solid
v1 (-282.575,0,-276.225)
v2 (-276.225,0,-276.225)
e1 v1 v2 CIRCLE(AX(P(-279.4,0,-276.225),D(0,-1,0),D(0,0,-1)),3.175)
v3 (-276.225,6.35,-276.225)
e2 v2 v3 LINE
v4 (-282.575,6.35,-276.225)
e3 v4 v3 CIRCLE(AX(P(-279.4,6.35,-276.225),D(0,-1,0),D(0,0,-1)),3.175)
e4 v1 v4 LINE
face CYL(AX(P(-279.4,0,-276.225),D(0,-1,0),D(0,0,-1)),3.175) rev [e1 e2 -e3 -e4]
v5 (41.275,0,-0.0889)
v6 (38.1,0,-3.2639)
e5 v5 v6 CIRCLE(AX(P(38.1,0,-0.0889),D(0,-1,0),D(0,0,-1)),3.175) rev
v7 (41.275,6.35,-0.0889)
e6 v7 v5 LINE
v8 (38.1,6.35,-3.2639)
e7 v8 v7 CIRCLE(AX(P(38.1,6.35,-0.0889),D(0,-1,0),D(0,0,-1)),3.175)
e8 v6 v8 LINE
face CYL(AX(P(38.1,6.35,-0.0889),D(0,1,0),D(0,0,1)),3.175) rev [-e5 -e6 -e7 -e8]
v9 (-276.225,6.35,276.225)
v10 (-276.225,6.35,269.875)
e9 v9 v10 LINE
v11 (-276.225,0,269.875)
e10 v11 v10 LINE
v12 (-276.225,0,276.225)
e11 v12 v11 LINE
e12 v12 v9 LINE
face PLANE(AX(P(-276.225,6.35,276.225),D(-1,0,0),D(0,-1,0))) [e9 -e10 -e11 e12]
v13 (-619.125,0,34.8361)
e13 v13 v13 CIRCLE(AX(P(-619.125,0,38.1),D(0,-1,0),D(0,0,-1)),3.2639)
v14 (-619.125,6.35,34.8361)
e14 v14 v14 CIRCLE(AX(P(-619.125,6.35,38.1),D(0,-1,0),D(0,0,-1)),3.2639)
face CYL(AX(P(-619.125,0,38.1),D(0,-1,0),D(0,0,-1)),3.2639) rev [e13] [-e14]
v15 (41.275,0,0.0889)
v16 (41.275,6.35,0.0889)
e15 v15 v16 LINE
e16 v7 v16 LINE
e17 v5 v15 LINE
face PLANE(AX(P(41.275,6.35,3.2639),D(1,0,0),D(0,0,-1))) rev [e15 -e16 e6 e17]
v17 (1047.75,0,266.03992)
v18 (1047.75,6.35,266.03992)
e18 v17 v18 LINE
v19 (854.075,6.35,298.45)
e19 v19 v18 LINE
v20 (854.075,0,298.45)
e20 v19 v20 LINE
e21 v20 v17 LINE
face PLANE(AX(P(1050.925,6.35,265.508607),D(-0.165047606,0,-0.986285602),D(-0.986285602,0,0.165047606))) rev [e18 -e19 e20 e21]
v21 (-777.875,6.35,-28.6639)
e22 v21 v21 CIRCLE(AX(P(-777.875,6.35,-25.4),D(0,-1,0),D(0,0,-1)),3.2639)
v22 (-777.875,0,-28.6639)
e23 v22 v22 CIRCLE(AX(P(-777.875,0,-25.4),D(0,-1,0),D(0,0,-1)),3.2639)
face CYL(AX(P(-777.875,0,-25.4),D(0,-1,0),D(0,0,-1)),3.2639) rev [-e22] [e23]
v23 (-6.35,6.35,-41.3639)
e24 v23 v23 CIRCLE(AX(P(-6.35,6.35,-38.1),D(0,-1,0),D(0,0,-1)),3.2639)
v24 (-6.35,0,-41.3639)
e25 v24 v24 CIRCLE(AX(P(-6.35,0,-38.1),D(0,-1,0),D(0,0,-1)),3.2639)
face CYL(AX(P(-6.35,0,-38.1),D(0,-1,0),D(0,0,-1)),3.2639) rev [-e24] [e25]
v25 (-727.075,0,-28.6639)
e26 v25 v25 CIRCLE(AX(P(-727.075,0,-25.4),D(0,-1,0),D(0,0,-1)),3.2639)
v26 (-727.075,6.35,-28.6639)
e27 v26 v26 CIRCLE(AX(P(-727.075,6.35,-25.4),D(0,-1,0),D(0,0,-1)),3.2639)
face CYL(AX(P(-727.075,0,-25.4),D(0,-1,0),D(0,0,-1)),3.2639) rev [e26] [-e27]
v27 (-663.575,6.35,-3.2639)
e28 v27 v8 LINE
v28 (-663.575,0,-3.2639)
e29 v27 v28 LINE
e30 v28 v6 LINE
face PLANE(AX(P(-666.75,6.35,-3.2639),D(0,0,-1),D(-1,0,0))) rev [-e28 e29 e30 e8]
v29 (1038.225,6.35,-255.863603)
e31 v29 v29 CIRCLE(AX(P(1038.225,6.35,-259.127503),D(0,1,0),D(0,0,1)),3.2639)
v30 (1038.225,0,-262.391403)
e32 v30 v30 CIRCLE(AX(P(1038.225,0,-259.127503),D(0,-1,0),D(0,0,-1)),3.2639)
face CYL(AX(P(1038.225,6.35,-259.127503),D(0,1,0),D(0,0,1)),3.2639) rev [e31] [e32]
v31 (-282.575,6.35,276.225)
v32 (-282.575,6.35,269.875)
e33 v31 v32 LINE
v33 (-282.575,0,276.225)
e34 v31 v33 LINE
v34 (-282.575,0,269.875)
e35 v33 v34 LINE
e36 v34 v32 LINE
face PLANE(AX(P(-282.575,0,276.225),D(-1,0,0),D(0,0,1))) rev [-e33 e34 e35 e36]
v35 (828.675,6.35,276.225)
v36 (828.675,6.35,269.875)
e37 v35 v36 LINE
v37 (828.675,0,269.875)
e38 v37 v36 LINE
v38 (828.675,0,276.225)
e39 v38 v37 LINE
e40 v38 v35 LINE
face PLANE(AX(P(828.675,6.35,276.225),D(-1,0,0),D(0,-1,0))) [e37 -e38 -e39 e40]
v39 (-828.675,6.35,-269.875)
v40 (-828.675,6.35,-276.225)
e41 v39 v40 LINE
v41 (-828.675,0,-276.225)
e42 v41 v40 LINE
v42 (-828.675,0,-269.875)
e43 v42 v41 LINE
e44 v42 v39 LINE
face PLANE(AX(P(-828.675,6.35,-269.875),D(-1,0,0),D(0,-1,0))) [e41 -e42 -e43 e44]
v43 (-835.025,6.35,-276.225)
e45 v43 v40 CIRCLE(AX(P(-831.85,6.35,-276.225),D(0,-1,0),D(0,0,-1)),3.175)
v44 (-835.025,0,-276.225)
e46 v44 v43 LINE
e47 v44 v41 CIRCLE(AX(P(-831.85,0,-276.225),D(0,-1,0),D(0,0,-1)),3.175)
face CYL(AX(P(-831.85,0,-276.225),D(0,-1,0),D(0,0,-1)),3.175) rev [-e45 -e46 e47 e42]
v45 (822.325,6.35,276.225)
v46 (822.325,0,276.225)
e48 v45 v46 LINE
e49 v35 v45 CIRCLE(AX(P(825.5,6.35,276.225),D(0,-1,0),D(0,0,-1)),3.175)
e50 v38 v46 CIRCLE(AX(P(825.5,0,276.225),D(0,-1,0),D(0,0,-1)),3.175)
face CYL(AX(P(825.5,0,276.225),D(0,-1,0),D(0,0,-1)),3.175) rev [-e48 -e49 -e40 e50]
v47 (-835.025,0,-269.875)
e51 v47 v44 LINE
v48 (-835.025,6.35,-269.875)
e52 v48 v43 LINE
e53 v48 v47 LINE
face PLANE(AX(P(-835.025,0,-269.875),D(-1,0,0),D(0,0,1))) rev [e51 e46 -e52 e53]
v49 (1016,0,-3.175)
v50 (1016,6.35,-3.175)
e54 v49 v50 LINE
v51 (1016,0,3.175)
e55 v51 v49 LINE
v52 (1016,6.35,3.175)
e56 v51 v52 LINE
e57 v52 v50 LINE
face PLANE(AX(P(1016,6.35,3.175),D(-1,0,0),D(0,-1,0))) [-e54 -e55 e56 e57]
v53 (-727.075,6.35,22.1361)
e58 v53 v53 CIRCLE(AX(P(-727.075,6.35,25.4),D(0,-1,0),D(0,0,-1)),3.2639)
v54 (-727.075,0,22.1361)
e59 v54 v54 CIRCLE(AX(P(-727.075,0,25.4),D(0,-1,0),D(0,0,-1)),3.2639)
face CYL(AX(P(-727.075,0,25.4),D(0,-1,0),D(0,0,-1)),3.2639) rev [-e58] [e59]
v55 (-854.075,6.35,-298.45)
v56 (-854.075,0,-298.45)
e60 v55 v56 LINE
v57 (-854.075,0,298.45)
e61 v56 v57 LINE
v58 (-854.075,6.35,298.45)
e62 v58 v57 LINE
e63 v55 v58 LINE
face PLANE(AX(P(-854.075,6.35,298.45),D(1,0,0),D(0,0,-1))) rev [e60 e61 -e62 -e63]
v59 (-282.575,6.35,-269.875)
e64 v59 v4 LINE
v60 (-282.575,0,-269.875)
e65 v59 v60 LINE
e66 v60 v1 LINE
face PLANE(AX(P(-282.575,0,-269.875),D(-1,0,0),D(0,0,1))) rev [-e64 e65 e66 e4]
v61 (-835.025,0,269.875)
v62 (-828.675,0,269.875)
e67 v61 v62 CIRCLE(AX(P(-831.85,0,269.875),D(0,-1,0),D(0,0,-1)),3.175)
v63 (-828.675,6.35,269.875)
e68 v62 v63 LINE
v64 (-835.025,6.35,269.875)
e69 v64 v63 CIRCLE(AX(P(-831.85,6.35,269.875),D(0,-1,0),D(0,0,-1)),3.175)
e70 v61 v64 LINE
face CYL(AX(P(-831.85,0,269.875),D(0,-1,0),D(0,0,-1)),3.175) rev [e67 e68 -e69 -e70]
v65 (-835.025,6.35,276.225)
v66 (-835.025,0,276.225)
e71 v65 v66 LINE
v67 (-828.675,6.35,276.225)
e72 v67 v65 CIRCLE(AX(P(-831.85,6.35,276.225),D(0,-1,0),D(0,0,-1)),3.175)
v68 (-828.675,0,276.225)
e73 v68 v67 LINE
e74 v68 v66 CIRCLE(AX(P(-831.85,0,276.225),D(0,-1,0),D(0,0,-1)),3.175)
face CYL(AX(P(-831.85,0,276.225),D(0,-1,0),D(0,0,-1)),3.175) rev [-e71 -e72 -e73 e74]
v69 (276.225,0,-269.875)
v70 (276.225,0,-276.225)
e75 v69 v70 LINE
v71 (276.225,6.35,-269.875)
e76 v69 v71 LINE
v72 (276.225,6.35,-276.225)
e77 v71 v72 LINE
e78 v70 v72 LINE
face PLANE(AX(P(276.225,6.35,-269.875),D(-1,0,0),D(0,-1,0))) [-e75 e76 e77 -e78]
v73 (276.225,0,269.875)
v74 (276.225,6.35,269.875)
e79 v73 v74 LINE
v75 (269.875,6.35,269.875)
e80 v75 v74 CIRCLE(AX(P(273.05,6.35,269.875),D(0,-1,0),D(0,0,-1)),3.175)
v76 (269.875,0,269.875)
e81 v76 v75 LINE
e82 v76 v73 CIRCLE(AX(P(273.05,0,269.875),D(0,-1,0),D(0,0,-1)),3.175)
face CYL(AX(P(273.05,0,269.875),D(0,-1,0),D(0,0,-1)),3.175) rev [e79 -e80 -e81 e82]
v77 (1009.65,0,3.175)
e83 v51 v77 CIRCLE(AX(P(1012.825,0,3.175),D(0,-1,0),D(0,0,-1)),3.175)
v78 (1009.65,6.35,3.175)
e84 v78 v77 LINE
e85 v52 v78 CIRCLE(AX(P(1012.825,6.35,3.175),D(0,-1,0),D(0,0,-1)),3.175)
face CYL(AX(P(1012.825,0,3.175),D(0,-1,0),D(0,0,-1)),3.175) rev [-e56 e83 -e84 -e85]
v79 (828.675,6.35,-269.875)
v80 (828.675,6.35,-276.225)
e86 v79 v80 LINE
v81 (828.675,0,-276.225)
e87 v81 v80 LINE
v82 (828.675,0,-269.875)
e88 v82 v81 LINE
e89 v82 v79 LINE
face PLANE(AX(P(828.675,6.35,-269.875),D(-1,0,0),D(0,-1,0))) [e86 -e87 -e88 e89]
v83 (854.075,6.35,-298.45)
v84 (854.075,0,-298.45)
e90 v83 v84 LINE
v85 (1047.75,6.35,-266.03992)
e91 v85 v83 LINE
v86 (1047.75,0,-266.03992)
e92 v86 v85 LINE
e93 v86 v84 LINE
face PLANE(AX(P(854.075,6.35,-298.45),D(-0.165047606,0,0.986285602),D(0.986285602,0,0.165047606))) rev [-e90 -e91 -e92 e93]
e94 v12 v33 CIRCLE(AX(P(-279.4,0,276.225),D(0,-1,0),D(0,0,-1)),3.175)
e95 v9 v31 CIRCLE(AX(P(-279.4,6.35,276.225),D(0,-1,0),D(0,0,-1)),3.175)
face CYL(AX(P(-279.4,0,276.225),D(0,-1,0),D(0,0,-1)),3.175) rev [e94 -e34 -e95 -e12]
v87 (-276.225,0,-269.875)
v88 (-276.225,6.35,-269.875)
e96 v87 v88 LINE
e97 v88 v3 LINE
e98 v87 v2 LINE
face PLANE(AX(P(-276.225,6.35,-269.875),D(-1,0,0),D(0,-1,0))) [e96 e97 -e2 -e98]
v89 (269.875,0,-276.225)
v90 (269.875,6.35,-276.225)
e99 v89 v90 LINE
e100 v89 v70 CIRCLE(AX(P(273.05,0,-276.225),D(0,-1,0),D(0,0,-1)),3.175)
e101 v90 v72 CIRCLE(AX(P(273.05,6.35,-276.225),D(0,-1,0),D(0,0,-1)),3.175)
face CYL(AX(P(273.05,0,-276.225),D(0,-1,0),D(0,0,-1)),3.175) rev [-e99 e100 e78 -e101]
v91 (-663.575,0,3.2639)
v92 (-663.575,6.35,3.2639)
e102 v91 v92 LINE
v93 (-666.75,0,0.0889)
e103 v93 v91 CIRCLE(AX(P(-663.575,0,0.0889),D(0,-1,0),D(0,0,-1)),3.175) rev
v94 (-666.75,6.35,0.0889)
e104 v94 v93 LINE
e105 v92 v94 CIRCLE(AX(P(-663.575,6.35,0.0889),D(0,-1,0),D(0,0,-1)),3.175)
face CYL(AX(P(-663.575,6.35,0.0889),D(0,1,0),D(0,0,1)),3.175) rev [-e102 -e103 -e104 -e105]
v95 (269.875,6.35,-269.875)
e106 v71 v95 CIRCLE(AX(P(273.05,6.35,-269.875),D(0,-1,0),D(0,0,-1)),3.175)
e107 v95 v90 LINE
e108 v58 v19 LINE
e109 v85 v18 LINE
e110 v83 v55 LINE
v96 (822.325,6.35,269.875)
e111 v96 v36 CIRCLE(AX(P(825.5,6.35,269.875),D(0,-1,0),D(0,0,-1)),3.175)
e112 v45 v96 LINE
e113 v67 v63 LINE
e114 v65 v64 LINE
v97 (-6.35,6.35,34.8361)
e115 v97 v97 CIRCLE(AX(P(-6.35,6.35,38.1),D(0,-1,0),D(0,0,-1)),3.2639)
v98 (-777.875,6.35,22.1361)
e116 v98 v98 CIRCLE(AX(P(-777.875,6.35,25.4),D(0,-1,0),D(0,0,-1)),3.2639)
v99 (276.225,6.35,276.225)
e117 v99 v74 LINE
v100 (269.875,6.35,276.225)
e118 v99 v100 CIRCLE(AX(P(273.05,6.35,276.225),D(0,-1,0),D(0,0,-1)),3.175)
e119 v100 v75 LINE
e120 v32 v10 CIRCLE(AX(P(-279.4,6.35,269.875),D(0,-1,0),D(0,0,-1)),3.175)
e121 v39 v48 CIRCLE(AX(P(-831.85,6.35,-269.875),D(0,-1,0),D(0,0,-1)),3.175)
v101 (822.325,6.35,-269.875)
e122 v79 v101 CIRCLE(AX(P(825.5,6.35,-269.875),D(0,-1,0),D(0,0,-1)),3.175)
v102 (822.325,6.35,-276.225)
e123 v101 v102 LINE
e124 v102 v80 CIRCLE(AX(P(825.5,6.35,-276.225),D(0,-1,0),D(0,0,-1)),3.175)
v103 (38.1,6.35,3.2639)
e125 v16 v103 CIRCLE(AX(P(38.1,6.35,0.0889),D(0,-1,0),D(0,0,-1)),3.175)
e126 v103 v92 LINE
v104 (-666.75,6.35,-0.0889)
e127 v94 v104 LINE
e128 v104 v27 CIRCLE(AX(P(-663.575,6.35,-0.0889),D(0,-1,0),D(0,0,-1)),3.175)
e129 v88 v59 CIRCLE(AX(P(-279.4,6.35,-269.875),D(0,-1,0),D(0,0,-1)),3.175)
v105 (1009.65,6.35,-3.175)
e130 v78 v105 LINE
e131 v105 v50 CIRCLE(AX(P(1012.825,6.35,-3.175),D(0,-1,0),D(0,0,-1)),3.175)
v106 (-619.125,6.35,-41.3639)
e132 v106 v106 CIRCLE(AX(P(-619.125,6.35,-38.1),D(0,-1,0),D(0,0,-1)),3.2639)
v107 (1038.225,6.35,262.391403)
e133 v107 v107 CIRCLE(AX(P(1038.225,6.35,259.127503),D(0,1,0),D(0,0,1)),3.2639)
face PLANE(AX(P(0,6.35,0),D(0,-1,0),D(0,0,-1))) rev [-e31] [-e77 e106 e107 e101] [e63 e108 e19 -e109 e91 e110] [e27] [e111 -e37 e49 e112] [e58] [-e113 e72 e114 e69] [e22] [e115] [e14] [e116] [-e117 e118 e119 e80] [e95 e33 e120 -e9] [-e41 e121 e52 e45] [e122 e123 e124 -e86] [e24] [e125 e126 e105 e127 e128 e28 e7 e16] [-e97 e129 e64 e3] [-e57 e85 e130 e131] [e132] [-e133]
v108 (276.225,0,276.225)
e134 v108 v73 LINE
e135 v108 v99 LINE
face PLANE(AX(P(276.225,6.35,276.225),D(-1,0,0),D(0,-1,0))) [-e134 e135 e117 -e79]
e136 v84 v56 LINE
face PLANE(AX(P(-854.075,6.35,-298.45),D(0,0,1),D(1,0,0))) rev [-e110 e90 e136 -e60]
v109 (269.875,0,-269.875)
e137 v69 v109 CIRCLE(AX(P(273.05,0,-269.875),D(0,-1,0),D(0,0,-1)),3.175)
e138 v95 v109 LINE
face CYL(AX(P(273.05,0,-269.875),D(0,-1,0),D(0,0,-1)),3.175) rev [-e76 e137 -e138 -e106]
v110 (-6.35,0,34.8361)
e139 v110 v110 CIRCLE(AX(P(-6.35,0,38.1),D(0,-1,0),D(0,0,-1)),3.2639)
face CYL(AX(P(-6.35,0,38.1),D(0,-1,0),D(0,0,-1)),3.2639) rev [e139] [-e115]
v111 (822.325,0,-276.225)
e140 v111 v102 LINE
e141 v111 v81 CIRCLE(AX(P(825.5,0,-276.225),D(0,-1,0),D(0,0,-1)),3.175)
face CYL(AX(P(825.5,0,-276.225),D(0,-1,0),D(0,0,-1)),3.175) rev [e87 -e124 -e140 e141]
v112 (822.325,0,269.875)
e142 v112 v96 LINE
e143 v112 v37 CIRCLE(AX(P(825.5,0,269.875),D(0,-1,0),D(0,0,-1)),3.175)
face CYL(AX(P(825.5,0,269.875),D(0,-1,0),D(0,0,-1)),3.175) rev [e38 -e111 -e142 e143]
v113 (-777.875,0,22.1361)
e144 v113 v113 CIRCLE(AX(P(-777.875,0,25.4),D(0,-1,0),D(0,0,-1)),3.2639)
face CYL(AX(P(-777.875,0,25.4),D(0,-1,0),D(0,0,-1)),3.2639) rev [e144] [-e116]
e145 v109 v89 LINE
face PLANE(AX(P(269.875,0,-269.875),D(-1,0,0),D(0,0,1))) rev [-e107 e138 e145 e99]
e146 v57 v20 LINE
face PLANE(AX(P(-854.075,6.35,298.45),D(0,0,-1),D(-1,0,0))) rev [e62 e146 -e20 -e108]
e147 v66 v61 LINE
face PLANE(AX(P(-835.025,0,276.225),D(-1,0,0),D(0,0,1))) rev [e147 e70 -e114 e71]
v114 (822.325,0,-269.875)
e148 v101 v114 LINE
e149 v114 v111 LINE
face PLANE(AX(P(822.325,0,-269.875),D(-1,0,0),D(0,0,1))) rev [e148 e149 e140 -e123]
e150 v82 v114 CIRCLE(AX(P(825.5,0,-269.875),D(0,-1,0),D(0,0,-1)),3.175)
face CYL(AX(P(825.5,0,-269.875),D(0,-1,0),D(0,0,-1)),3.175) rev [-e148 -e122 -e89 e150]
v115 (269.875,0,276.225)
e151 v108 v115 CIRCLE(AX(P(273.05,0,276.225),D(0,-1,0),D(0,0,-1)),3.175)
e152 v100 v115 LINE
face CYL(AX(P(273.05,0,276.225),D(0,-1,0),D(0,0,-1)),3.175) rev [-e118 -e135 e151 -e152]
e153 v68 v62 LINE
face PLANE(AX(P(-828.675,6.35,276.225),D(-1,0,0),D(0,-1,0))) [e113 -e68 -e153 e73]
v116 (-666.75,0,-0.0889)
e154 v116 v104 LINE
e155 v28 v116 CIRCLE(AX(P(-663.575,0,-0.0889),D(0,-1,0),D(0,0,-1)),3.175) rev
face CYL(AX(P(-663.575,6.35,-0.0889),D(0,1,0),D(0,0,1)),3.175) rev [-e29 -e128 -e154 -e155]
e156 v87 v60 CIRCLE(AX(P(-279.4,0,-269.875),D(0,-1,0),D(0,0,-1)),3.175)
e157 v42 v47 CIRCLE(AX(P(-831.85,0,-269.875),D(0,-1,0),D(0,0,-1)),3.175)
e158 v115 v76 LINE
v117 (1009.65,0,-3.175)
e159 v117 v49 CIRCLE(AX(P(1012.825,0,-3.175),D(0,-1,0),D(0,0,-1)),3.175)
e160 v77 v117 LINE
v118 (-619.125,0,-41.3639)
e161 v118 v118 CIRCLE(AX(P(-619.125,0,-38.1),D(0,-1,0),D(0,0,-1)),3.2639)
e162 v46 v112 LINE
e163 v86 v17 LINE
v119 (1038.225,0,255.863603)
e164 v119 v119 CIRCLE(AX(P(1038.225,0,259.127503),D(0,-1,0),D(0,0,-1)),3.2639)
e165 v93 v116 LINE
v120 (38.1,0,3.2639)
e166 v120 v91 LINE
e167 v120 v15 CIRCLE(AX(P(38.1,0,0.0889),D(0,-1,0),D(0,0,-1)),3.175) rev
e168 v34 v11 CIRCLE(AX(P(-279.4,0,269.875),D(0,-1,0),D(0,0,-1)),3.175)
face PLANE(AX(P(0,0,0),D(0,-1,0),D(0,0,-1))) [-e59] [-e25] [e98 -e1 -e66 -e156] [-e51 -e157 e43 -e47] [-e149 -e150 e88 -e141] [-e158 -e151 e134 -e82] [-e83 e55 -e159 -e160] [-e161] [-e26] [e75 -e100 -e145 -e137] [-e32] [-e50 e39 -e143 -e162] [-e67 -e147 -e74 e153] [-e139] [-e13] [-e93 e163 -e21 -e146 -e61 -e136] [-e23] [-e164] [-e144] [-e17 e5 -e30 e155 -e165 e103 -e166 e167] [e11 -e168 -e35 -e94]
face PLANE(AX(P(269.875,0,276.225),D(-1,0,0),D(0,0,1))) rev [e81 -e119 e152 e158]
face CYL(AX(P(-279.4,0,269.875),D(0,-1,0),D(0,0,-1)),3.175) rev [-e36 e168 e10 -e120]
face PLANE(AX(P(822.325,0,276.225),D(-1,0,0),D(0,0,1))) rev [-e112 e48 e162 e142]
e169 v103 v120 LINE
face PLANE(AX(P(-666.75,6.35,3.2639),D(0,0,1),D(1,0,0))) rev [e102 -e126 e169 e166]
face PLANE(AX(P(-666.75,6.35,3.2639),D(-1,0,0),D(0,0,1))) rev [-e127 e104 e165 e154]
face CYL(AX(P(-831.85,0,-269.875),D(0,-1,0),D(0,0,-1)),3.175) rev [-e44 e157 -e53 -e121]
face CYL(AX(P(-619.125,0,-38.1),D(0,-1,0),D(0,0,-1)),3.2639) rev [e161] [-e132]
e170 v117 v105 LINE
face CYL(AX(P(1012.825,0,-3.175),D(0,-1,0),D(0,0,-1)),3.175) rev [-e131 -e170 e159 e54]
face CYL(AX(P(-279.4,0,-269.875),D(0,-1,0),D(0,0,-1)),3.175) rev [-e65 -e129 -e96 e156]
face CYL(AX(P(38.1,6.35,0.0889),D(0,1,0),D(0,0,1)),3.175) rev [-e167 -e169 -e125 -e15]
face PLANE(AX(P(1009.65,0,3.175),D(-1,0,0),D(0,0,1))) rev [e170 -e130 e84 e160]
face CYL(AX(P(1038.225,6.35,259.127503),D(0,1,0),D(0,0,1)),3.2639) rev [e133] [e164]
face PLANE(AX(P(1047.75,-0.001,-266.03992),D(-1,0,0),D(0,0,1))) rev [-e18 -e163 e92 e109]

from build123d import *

# Parameters (mm, degrees)
BOSS_EXTRUDE1_DEPTH             = 6.35
F_1_4_0_25_DIAMETER_SLOT2_DEPTH = 6.35
CUT_EXTRUDE2_REACH              = 1094.5
F_0_257_DIAMETER_HOLE3_D        = 6.5278
F_0_257_DIAMETER_HOLE2_D        = 6.5278
SKETCH32_W                      = 708.025
SKETCH32_H                      = 6.5278
CUT_EXTRUDE5_DEPTH              = 1090.446092058
FILLET3_R                       = 3.175
F_0_257_DIAMETER_HOLE1_D        = 6.5278


# Read off the part's stored shape, not the designer's step: 1/4 (0.25) Diameter Slot2
with BuildPart() as part:
    # Sketch1 → Boss-Extrude1 (new body)
    with BuildSketch(Plane(origin=(0, 0, 0), x_dir=(1, 0, 0), z_dir=(0, 1, 0))):
        Polygon((854.075, 298.45), (1050.925, 265.508607402), (1050.925, -265.508607402), (854.075, -298.45), (-854.075, -298.45), (-854.075, 298.45), align=None)
    extrude(amount=BOSS_EXTRUDE1_DEPTH)

    # 1/4 (0.25) Diameter Slot2 outline → 1/4 (0.25) Diameter Slot2 (cut)
    with BuildSketch(Plane(origin=(0, 0, 0), x_dir=(1, 0, 0), z_dir=(0, 1, 0))):
        with BuildLine():
            ThreePointArc((1016, 3.175), (1012.825, 6.35), (1009.65, 3.175))
            Line((1009.65, 3.175), (1009.65, -3.175))
            ThreePointArc((1009.65, -3.175), (1012.825, -6.35), (1016, -3.175))
            Line((1016, -3.175), (1016, 3.175))
        make_face()
        with BuildLine():
            ThreePointArc((828.675, 276.225), (825.5, 279.4), (822.325, 276.225))
            Line((822.325, 276.225), (822.325, 269.875))
            ThreePointArc((822.325, 269.875), (825.5, 266.7), (828.675, 269.875))
            Line((828.675, 269.875), (828.675, 276.225))
        make_face()
        with BuildLine():
            Line((828.675, -276.225), (828.675, -269.875))
            ThreePointArc((828.675, -269.875), (825.5, -266.7), (822.325, -269.875))
            Line((822.325, -269.875), (822.325, -276.225))
            ThreePointArc((822.325, -276.225), (825.5, -279.4), (828.675, -276.225))
        make_face()
        with BuildLine():
            ThreePointArc((276.225, 276.225), (273.05, 279.4), (269.875, 276.225))
            Line((269.875, 276.225), (269.875, 269.875))
            ThreePointArc((269.875, 269.875), (273.05, 266.7), (276.225, 269.875))
            Line((276.225, 269.875), (276.225, 276.225))
        make_face()
        with BuildLine():
            Line((276.225, -276.225), (276.225, -269.875))
            ThreePointArc((276.225, -269.875), (273.05, -266.7), (269.875, -269.875))
            Line((269.875, -269.875), (269.875, -276.225))
            ThreePointArc((269.875, -276.225), (273.05, -279.4), (276.225, -276.225))
        make_face()
        with BuildLine():
            ThreePointArc((-276.225, 276.225), (-279.4, 279.4), (-282.575, 276.225))
            Line((-282.575, 276.225), (-282.575, 269.875))
            ThreePointArc((-282.575, 269.875), (-279.4, 266.7), (-276.225, 269.875))
            Line((-276.225, 269.875), (-276.225, 276.225))
        make_face()
        with BuildLine():
            Line((-276.225, -276.225), (-276.225, -269.875))
            ThreePointArc((-276.225, -269.875), (-279.4, -266.7), (-282.575, -269.875))
            Line((-282.575, -269.875), (-282.575, -276.225))
            ThreePointArc((-282.575, -276.225), (-279.4, -279.4), (-276.225, -276.225))
        make_face()
        with BuildLine():
            ThreePointArc((-828.675, 276.225), (-831.85, 279.4), (-835.025, 276.225))
            Line((-835.025, 276.225), (-835.025, 269.875))
            ThreePointArc((-835.025, 269.875), (-831.85, 266.7), (-828.675, 269.875))
            Line((-828.675, 269.875), (-828.675, 276.225))
        make_face()
        with BuildLine():
            Line((-828.675, -276.225), (-828.675, -269.875))
            ThreePointArc((-828.675, -269.875), (-831.85, -266.7), (-835.025, -269.875))
            Line((-835.025, -269.875), (-835.025, -276.225))
            ThreePointArc((-835.025, -276.225), (-831.85, -279.4), (-828.675, -276.225))
        make_face()
    extrude(amount=F_1_4_0_25_DIAMETER_SLOT2_DEPTH, mode=Mode.SUBTRACT)

    # Sketch18 → Cut-Extrude2 (cut, up to next)
    with BuildSketch(Plane(origin=(0, 6.35, 0), x_dir=(1, 0, 0), z_dir=(0, 1, 0)), mode=Mode.PRIVATE) as cut_extrude2_sk1:
        Polygon((1047.75, -266.039920186), (1050.925, -265.508607402), (1050.925, 265.508607402), (1047.75, 266.039920186), align=None)
    cut_extrude2_tool1 = extrude(cut_extrude2_sk1.sketch, amount=-CUT_EXTRUDE2_REACH, mode=Mode.PRIVATE) & part.part
    add(cut_extrude2_tool1.solids().sort_by_distance((1049.336971, 6.35, 0))[0], mode=Mode.SUBTRACT)

    # F (0.257) Diameter Hole3 (through all)
    with Locations(Plane(origin=(0, 6.35, 0), x_dir=(1, 0, 0), z_dir=(0, 1, 0))):
        with Locations((1038.225, -259.127502839), (1038.225, 259.127502839)):
            Hole(F_0_257_DIAMETER_HOLE3_D / 2)

    # F (0.257) Diameter Hole2 (through all)
    with Locations(Plane(origin=(0, 0, 0), x_dir=(-1, 0, 0), z_dir=(0, -1, 0))):
        with Locations((777.875, 25.4), (777.875, -25.4), (727.075, -25.4), (727.075, 25.4)):
            Hole(F_0_257_DIAMETER_HOLE2_D / 2)

    # Sketch32 → Cut-Extrude5 (cut, through all)
    with BuildSketch(Plane.XZ):
        with Locations((-312.7375, 0)):
            Rectangle(SKETCH32_W, SKETCH32_H)
    extrude(amount=-CUT_EXTRUDE5_DEPTH, mode=Mode.SUBTRACT)

    # Fillet3
    fillet3_edges = [part.edges().sort_by_distance(p)[0] for p in [
        (41.275, 3.175, 3.2639),
        (41.275, 3.175, -3.2639),
        (-666.75, 3.175, -3.2639),
        (-666.75, 3.175, 3.2639),
    ]]
    fillet(fillet3_edges, radius=FILLET3_R)

    # F (0.257) Diameter Hole1 (through all)
    with Locations(Plane(origin=(0, 0, 0), x_dir=(-1, 0, 0), z_dir=(0, -1, 0))):
        with Locations((619.125, 38.1), (6.35, 38.1), (619.125, -38.1), (6.35, -38.1)):
            Hole(F_0_257_DIAMETER_HOLE1_D / 2)


solid = part.part
